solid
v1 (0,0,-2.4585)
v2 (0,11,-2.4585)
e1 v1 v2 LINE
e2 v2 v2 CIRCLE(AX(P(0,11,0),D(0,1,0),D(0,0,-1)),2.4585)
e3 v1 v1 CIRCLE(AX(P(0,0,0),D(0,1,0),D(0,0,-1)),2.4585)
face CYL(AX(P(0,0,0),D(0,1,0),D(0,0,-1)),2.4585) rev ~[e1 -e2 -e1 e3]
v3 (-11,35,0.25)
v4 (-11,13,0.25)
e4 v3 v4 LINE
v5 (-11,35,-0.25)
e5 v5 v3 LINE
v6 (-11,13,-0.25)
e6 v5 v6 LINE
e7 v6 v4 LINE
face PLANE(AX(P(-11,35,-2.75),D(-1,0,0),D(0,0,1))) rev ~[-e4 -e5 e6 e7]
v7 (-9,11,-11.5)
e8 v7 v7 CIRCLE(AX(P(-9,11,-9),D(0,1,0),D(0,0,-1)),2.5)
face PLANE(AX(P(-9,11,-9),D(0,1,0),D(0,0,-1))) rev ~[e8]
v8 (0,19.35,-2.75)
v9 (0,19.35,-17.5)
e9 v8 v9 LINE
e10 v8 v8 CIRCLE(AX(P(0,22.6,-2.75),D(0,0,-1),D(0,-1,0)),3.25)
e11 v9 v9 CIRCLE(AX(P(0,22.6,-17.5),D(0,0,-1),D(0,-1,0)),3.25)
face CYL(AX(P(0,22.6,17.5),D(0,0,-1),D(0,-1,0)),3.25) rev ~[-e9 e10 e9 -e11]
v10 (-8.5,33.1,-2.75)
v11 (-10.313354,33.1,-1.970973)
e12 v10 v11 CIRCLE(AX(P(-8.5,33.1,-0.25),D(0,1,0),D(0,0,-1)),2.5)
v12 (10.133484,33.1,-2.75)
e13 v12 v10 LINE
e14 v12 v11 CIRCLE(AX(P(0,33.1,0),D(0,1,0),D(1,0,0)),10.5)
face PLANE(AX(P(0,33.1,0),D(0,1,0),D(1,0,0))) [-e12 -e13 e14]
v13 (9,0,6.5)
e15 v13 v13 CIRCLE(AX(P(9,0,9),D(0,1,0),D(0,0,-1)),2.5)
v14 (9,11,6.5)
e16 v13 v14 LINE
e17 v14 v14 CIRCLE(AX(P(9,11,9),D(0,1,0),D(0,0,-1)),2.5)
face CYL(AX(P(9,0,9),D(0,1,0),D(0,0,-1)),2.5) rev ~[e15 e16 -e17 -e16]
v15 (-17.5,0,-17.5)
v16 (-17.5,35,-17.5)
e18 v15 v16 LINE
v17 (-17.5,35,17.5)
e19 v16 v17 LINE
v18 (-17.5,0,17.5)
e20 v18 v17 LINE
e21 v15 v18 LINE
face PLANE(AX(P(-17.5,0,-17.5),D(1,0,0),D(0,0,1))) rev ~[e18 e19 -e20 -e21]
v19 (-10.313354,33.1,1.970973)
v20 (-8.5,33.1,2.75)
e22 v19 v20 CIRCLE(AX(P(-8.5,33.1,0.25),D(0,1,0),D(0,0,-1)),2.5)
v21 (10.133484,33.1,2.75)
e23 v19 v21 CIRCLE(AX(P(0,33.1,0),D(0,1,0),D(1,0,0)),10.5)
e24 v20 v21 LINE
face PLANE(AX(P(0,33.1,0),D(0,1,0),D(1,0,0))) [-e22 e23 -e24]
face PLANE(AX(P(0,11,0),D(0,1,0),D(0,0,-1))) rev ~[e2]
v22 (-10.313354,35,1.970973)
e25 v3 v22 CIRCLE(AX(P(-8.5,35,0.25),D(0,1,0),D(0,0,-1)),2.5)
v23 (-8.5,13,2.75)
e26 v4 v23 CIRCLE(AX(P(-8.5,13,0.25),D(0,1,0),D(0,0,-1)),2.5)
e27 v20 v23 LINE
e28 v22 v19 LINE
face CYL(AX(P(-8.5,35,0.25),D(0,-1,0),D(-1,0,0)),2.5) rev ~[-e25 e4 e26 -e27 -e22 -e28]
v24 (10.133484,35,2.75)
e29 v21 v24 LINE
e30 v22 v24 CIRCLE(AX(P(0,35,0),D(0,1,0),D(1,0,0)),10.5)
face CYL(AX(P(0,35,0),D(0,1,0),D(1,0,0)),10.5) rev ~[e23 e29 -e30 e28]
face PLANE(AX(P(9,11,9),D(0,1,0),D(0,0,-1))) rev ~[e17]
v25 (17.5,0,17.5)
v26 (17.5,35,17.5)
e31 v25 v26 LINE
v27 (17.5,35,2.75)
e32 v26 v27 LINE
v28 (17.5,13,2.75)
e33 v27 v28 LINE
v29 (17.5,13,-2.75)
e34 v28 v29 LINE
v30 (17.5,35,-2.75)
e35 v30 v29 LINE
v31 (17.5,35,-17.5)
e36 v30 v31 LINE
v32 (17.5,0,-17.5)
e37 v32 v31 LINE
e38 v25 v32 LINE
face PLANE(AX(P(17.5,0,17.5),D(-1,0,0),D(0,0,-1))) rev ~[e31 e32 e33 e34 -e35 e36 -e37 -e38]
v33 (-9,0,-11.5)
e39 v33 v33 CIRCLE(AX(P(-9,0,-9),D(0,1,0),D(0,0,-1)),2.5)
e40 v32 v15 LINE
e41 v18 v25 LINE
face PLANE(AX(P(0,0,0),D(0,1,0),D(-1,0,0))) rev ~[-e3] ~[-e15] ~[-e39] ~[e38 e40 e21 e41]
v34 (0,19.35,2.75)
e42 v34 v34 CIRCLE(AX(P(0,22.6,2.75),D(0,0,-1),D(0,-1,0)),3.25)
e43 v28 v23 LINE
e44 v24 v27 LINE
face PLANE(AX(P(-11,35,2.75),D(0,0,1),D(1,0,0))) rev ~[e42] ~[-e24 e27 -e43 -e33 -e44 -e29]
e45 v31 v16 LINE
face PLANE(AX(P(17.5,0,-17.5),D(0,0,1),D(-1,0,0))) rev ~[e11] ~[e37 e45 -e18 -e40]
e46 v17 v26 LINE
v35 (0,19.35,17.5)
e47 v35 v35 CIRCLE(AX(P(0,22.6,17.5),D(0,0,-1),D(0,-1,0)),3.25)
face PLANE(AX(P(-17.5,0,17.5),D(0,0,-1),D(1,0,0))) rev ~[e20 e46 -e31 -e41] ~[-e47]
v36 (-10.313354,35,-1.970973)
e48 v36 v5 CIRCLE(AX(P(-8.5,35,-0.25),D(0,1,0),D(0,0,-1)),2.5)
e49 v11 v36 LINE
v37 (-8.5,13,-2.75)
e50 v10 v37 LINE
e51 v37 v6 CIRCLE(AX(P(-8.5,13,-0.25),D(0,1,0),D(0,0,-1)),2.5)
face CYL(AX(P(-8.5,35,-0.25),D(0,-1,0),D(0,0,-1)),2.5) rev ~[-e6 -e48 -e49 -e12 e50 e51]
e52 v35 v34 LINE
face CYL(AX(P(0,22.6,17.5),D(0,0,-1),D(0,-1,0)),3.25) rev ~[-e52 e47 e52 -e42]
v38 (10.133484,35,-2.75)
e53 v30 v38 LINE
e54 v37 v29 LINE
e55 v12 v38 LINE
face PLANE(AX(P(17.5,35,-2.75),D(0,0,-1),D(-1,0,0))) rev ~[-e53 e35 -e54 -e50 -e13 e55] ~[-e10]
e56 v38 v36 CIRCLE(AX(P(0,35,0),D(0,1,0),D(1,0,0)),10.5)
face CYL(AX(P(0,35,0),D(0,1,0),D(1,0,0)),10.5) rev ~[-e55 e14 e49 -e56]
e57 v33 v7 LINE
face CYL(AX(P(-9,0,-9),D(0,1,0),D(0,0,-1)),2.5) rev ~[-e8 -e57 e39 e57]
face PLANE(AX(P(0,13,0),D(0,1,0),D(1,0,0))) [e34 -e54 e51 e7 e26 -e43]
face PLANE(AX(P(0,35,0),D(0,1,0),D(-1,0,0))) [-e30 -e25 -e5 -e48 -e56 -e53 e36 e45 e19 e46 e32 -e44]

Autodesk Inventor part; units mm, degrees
ref_plane "YZ Plane" through (0, 0, 0) normal (1, 0, 0) x (0, 1, 0)
ref_plane "XZ Plane" through (0, 0, 0) normal (0, 1, 0) x (-1, 0, 0)
ref_plane "XY Plane" through (0, 0, 0) normal (0, 0, 1) x (1, 0, 0)
sketch "Sketch1" plane through (0, 0, 0) normal (0, 1, 0) x (-1, 0, 0)
  line L0 (17.5, 17.5) -> (-17.5, 17.5)
  line L1 (-17.5, 17.5) -> (-17.5, -17.5)
  line L2 (-17.5, -17.5) -> (17.5, -17.5)
  line L3 (17.5, -17.5) -> (17.5, 17.5)
  line L4 (17.5, 17.5) -> (-17.5, -17.5) construction
  line L5 (-17.5, 17.5) -> (17.5, -17.5) construction
  point P0 (0, 0)
  dimension "d0" = 35
  dimension "d1" = 35
extrude "Extrusion1" add sketch "Sketch1" along normal blind 35
sketch "Sketch2" plane through (0, 35, 0) normal (0, 1, 0) x (1, 0, 0)
  line L0 (-2.3616, -50.7705) -> (15.6384, -50.7705)
  line L1 (15.6384, -50.7705) -> (15.6384, -44.7705)
  line L2 (15.6384, -44.7705) -> (-2.3616, -44.7705)
  line L3 (-2.3616, -44.7705) -> (-2.3616, -50.7705)
  line L4 (-2.3616, -50.7705) -> (15.6384, -44.7705) construction
  line L5 (15.6384, -50.7705) -> (-2.3616, -44.7705) construction
  circle A0 centre (6.6384, -47.7705) radius 11
  line L6 (-10.8616, -65.2705) -> (24.1384, -65.2705)
  line L7 (24.1384, -65.2705) -> (24.1384, -30.2705)
  line L8 (24.1384, -30.2705) -> (-10.8616, -30.2705)
  line L9 (-10.8616, -30.2705) -> (-10.8616, -65.2705)
  line L10 (-10.8616, -65.2705) -> (24.1384, -30.2705) construction
  line L11 (24.1384, -65.2705) -> (-10.8616, -30.2705) construction
  circle A1 centre (6.6384, -47.7705) radius 28.5
  circle A2 centre (0, 0) radius 10.5
  line L12 (-8.5, 2.75) -> (8.5, 2.75)
  line L13 (8.5, 2.75) -> (8.5, -2.75)
  line L14 (8.5, -2.75) -> (-8.5, -2.75)
  line L15 (-8.5, -2.75) -> (-8.5, 2.75)
  line L16 (-8.5, 2.75) -> (8.5, -2.75) construction
  line L17 (8.5, 2.75) -> (-8.5, -2.75) construction
  point P0 (-38.3616, 79.7295)
  dimension "d4" = 18
  dimension "d5" = 6
  dimension "d6" = 22
  dimension "d7" = 35
  dimension "d8" = 35
  dimension "d9" = 21
  dimension "d10" = 17
  dimension "d11" = 5.5
extrude "Extrusion2" cut sketch "Sketch2" against normal blind 22 contours L12 L13 L14 L15
extrude "Extrusion3" cut sketch "Sketch2" against normal blind 1.9 contours A2
sketch "Sketch3" plane through (-17.5, 0, 17.5) normal (0, 0, 1) x (1, 0, 0)
  line L0 (7, 35) -> (28, 35) construction
  line L1 (17.5, 35) -> (17.5, 22.6) construction
  point P0 (17.5, 0)
  dimension "d16" = 12.4
hole "Hole1" at (0, 22.6, 17.5) direction (0, 0, -1) diameter 6.5 end through all clearance for "Hex Head Cap Screw ISO 24017" size "M6" standard "ISO"
sketch "Sketch4" plane through (0, 0, 0) normal (0, -1, 0) x (1, 0, 0)
  point P0 (0, 0)
hole "Hole2" at (0, 0, 0) direction (0, 1, 0) diameter 4.917 depth 11 thread size "M6x1" class "6H" standard "ANSI Metric M Profile"
sketch "Sketch6" plane through (0, 0, 0) normal (0, -1, 0) x (1, 0, 0)
  line L0 (-17.5, -17.5) -> (-17.5, 17.5) construction
  line L1 (17.5, 17.5) -> (-17.5, 17.5) construction
  line L2 (-17.5, 17.5) -> (-17.5, -17.5) construction
  line L3 (-17.5, -17.5) -> (17.5, -17.5) construction
  line L4 (17.5, -17.5) -> (17.5, 17.5) construction
  line L5 (17.5, 17.5) -> (-17.5, -17.5) construction
  line L6 (-17.5, 17.5) -> (17.5, -17.5) construction
  line L7 (9, -9) -> (-9, -9) construction
  line L8 (-9, -9) -> (-9, 9) construction
  line L9 (-9, 9) -> (9, 9) construction
  line L10 (9, 9) -> (9, -9) construction
  line L11 (9, -9) -> (-9, 9) construction
  line L12 (-9, -9) -> (9, 9) construction
  point P0 (0, 0)
  dimension "d63" = 18
  dimension "d64" = 18
hole "Hole3" at (9, 0, 9) at (-9, 0, -9) direction (0, 1, 0) diameter 5 depth 11
sketch "Sketch7" plane through (0, 35, 0) normal (0, 1, 0) x (1, 0, 0)
  line L0 (-8.5, 2.75) -> (8.5, 2.75) construction
  line L1 (8.5, 2.75) -> (17.5, 2.75) construction
  line L2 (17.5, -17.5) -> (17.5, 17.5) construction
  line L3 (8.5, 2.75) -> (8.5, -2.75) projected
  line L4 (17.5, 2.75) -> (8.5, 2.75)
  line L5 (8.5, 2.75) -> (8.5, -2.75)
  line L6 (8.5, -2.75) -> (17.5, -2.75)
  line L7 (17.5, -2.75) -> (17.5, 2.75)
  point P0 (0, 0)
extrude "Extrusion4" cut sketch "Sketch7" against normal up to surface (22 mm away)
sketch "Sketch8" plane through (0, 35, 0) normal (0, 1, 0) x (1, 0, 0)
  line L0 (17.5, 2.75) -> (-8.5, 2.75) projected
  line L1 (-8.5, 2.75) -> (-11, 2.75)
  line L2 (-11, 2.75) -> (-11, -2.75)
  line L3 (-11, -2.75) -> (-8.5, -2.75)
  line L4 (-8.5, -2.75) -> (-8.5, 2.75)
  line L5 (-8.5, 2.75) -> (-10.1335, 2.75) construction
  arc A0 (10.1335, 2.75) -> (10.1335, -2.75) centre (0, 0) ccw construction
  dimension "d44" = 2.5
  dimension "d45" = 1.6335
extrude "Extrusion5" cut sketch "Sketch8" against normal up to surface (22 mm away)
fillet "Fillet2" radius 2.5 2 edges at (-11, 24, 2.75) (-11, 24, -2.75)
properties part number "Holder"
